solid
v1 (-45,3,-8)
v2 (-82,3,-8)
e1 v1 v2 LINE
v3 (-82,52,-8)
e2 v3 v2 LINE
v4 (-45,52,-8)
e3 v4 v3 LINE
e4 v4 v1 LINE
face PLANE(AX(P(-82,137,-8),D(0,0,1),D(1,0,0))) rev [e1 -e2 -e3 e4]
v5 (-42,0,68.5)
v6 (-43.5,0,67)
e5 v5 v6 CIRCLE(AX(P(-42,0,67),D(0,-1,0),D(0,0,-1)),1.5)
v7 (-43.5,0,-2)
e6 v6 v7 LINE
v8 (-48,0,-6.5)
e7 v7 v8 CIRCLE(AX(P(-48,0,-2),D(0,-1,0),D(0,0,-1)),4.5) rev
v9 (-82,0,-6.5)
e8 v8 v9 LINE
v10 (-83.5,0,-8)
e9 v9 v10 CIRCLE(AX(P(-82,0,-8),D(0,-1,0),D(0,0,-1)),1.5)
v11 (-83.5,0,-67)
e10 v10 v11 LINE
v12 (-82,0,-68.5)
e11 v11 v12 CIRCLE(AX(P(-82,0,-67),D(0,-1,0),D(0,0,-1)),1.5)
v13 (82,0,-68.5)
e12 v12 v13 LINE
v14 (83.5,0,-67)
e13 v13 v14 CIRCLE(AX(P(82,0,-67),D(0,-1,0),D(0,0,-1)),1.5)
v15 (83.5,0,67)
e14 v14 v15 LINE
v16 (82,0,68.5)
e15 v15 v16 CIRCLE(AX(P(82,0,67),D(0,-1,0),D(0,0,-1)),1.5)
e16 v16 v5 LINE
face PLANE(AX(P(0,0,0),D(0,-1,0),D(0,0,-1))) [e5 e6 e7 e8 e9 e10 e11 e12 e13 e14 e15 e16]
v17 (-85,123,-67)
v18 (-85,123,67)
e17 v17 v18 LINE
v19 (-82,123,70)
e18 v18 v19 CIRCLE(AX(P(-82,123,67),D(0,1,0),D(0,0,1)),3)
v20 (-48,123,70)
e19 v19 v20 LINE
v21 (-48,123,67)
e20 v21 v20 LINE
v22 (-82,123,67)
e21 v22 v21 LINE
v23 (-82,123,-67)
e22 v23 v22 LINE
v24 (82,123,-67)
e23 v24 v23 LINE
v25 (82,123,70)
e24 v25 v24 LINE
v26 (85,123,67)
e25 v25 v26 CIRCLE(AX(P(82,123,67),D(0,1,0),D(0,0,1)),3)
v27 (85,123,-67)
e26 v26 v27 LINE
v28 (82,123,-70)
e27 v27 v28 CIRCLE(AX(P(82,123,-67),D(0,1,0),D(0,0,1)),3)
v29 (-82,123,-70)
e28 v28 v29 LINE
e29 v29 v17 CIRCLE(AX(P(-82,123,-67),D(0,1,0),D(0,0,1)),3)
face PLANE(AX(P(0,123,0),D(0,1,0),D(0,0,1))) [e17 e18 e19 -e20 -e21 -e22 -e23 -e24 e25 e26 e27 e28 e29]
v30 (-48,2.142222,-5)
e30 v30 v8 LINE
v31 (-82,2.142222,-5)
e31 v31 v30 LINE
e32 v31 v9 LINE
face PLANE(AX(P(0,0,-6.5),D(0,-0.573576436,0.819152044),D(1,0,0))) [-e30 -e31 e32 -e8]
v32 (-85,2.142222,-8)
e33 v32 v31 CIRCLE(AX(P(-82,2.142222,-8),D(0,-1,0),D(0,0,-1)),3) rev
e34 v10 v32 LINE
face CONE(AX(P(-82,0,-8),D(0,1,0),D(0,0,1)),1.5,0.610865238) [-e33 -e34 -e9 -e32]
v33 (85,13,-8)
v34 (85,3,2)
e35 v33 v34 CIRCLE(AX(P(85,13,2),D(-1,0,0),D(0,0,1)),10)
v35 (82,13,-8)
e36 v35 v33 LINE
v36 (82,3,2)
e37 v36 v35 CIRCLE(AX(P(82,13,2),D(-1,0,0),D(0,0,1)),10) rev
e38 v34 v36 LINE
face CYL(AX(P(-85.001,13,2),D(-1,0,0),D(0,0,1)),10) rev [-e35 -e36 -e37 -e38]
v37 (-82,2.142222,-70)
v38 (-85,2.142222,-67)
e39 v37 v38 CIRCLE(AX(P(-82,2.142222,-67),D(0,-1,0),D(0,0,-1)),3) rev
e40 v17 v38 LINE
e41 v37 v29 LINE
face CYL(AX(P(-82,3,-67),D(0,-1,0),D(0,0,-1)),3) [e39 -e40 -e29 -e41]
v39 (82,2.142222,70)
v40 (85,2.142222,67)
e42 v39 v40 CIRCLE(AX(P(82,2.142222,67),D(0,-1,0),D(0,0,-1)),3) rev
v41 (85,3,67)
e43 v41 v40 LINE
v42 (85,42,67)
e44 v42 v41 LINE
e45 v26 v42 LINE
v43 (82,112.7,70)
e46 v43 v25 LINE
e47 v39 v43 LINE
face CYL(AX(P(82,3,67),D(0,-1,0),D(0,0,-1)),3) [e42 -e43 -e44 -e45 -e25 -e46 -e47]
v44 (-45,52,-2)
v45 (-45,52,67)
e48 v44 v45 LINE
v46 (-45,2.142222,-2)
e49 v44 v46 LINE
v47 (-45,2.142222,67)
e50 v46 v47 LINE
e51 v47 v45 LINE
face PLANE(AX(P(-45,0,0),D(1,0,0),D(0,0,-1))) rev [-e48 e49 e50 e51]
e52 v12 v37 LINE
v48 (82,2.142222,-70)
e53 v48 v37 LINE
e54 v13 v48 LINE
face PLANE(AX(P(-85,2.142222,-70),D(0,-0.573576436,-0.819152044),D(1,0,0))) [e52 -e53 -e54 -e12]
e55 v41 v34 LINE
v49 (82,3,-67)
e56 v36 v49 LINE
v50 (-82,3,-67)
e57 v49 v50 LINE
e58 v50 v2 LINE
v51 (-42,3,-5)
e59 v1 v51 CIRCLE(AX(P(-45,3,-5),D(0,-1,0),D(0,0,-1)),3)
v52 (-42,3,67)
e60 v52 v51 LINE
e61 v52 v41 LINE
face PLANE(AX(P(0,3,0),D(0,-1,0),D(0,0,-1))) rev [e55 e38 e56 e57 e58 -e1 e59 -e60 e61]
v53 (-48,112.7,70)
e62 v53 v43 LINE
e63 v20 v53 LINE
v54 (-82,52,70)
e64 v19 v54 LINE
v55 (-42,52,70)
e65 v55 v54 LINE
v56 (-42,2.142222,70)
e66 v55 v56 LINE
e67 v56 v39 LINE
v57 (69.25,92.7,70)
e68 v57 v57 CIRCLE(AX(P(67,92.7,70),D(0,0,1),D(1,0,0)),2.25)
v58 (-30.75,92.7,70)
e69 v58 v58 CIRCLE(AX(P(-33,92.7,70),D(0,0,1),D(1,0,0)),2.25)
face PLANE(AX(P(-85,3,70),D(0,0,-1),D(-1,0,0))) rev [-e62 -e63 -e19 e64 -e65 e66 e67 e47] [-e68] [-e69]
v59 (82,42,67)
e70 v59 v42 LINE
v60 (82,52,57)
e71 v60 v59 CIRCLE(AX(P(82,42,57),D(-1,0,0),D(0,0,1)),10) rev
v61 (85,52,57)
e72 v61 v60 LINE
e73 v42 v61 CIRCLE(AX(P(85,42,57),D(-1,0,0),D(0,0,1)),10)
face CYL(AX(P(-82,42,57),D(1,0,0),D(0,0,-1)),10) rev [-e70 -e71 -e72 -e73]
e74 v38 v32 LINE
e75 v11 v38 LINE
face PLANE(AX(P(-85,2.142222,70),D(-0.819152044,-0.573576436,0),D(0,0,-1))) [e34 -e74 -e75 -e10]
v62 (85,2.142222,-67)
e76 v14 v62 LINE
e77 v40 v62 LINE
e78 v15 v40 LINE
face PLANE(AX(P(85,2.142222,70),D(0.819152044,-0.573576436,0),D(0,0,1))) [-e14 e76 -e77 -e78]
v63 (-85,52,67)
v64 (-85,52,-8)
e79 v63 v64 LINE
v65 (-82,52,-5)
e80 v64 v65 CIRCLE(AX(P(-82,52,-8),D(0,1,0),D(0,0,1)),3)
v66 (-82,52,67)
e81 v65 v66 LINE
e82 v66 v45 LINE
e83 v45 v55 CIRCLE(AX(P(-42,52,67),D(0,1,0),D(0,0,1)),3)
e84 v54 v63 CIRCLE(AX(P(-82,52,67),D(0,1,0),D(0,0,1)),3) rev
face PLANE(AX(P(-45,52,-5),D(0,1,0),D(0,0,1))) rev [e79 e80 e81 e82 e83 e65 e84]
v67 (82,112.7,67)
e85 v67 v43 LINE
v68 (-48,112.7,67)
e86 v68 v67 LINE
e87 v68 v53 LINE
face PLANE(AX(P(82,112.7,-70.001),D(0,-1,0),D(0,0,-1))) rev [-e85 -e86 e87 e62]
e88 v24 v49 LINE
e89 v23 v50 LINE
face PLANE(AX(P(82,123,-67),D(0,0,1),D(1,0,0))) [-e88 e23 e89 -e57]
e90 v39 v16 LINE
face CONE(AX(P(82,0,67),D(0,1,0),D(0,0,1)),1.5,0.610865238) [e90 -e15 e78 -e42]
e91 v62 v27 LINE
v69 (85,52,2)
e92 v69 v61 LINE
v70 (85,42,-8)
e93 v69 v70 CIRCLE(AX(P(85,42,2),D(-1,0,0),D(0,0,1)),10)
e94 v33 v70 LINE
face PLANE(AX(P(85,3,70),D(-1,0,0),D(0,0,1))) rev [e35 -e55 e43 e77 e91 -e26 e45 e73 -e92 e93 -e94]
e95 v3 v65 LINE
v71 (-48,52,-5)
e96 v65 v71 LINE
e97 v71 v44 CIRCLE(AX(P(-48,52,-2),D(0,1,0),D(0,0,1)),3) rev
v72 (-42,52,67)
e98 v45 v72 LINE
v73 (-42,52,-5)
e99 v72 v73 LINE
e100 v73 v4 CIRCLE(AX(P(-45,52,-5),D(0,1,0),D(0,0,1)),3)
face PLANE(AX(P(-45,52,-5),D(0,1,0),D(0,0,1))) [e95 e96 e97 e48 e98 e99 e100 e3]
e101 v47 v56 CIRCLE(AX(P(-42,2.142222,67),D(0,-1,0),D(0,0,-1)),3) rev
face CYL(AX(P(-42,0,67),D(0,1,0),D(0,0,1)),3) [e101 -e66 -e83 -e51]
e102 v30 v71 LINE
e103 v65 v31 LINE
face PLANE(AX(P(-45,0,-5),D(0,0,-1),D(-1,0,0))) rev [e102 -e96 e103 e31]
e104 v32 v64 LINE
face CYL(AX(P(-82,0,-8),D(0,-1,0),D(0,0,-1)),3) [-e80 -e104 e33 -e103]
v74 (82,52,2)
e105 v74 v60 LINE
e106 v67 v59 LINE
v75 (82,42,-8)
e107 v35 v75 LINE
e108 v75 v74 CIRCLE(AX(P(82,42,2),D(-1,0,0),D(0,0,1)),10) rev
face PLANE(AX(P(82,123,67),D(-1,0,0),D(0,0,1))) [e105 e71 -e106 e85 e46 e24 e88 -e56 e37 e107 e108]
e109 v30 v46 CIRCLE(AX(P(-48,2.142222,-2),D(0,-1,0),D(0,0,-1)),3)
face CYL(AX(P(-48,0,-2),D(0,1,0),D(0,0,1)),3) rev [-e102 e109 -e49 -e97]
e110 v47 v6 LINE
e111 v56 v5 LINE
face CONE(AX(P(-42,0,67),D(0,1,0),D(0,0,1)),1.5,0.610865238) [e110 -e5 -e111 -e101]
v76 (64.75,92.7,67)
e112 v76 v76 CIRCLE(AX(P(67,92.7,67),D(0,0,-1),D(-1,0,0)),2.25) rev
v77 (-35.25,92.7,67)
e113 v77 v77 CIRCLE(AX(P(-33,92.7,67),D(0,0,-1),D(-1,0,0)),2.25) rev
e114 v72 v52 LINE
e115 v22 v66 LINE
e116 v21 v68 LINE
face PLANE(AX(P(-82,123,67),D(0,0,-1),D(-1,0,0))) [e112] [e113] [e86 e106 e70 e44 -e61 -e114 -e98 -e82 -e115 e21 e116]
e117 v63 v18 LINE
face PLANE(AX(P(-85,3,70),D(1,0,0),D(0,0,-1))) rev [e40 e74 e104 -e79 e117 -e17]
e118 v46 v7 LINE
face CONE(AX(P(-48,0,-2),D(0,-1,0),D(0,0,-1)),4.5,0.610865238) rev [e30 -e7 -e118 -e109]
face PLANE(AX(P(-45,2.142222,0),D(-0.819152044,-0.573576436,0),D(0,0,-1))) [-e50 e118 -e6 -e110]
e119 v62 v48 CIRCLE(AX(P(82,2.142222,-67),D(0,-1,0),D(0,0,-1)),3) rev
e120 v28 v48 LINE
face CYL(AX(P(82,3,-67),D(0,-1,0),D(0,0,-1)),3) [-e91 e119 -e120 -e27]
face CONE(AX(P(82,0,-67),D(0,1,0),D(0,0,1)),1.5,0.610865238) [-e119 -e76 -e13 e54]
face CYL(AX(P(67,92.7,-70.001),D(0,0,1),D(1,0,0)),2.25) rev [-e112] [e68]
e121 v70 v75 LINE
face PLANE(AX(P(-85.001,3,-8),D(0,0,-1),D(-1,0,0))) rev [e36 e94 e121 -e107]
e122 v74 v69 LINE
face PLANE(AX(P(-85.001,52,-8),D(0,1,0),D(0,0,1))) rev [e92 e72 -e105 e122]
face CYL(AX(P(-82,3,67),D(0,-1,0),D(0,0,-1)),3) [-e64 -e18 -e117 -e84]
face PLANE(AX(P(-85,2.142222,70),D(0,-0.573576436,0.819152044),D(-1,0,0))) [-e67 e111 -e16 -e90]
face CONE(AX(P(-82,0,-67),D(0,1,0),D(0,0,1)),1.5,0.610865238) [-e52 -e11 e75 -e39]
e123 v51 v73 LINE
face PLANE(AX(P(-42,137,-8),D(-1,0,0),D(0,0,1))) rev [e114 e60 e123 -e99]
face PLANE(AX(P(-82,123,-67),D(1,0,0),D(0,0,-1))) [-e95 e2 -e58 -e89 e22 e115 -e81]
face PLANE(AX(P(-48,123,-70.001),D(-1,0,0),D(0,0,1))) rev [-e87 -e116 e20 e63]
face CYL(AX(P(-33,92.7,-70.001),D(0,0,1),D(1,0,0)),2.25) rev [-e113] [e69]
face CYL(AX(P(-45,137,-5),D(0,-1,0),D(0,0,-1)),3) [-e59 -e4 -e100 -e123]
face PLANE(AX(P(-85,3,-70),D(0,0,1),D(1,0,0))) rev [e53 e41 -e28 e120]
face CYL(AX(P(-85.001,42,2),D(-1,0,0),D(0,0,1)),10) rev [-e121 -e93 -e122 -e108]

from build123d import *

# Parameters (mm, degrees)
SKETCH1_W           = 170
SKETCH1_H           = 140
BOSS_EXTRUDE1_DEPTH = 3
SKETCH3_W           = 170
SKETCH3_H           = 140
SKETCH3_W_2         = 164
SKETCH3_H_2         = 134
BOSS_EXTRUDE2_DEPTH = 120
CUT_EXTRUDE1_REACH  = 206.827
SKETCH4_W           = 130
SKETCH4_H           = 10.3
SKETCH5_W           = 75
SKETCH5_H           = 52
CUT_EXTRUDE2_DEPTH  = 40
BOSS_EXTRUDE3_DEPTH = 49
CUT_EXTRUDE3_REACH  = 206.827
SKETCH8_R           = 2.25
CUT_EXTRUDE4_REACH  = 223.199
SKETCH9_W           = 75
SKETCH9_H           = 49
FILLET1_R           = 3
CHAMFER1_SIZE       = 1.5
CHAMFER1_SIZE2      = 2.14222201
FILLET2_R           = 10


with BuildPart() as part:
    # Sketch1 → Boss-Extrude1 (new body)
    with BuildSketch(Plane(origin=(0, 0, 0), x_dir=(1, 0, 0), z_dir=(0, 1, 0))):
        Rectangle(SKETCH1_W, SKETCH1_H)
    extrude(amount=BOSS_EXTRUDE1_DEPTH)

    # Sketch3 → Boss-Extrude2 (add)
    with BuildSketch(Plane(origin=(0, 3, 0), x_dir=(1, 0, 0), z_dir=(0, 1, 0))):
        Rectangle(SKETCH3_W, SKETCH3_H)
        Rectangle(SKETCH3_W_2, SKETCH3_H_2, mode=Mode.SUBTRACT)
    extrude(amount=BOSS_EXTRUDE2_DEPTH)

    # Sketch4 → Cut-Extrude1 (cut, up to next)
    with BuildSketch(Plane.XY.offset(70), mode=Mode.PRIVATE) as cut_extrude1_sk1:
        with Locations((17, 117.85)):
            Rectangle(SKETCH4_W, SKETCH4_H)
    cut_extrude1_tool1 = extrude(cut_extrude1_sk1.sketch, amount=-CUT_EXTRUDE1_REACH, mode=Mode.PRIVATE) & part.part
    add(cut_extrude1_tool1.solids().sort_by_distance((17, 117.85, 70))[0], mode=Mode.SUBTRACT)

    # Sketch5 → Cut-Extrude2 (cut)
    with BuildSketch(Plane.ZY.offset(85)):
        with Locations((32.5, 26)):
            Rectangle(SKETCH5_W, SKETCH5_H)
    extrude(amount=-CUT_EXTRUDE2_DEPTH, mode=Mode.SUBTRACT)

    # Sketch6 → Boss-Extrude3 (add)
    with BuildSketch(Plane(origin=(0, 3, 0), x_dir=(1, 0, 0), z_dir=(0, 1, 0))):
        Polygon((-45, 5), (-45, -67), (-42, -67), (-42, 8), (-82, 8), (-82, 5), align=None)
    extrude(amount=BOSS_EXTRUDE3_DEPTH)

    # Sketch8 → Cut-Extrude3 (cut, up to next)
    with BuildSketch(Plane.XY.offset(70), mode=Mode.PRIVATE) as cut_extrude3_sk1:
        with Locations((67, 92.7)):
            Circle(SKETCH8_R)
    cut_extrude3_tool1 = extrude(cut_extrude3_sk1.sketch, amount=-CUT_EXTRUDE3_REACH, mode=Mode.PRIVATE) & part.part
    # Sketch8 → Cut-Extrude3 (cut, up to next)
    with BuildSketch(Plane.XY.offset(70), mode=Mode.PRIVATE) as cut_extrude3_sk2:
        with Locations((-33, 92.7)):
            Circle(SKETCH8_R)
    cut_extrude3_tool2 = extrude(cut_extrude3_sk2.sketch, amount=-CUT_EXTRUDE3_REACH, mode=Mode.PRIVATE) & part.part
    add(cut_extrude3_tool1.solids().sort_by_distance((67, 92.7, 70))[0], mode=Mode.SUBTRACT)
    add(cut_extrude3_tool2.solids().sort_by_distance((-33, 92.7, 70))[0], mode=Mode.SUBTRACT)

    # Sketch9 → Cut-Extrude4 (cut, up to next)
    with BuildSketch(Plane(origin=(85, 0, 0), x_dir=(0, 0, -1), z_dir=(1, 0, 0)), mode=Mode.PRIVATE) as cut_extrude4_sk1:
        with Locations((-29.5, 27.5)):
            Rectangle(SKETCH9_W, SKETCH9_H)
    cut_extrude4_tool1 = extrude(cut_extrude4_sk1.sketch, amount=-CUT_EXTRUDE4_REACH, mode=Mode.PRIVATE) & part.part
    add(cut_extrude4_tool1.solids().sort_by_distance((85, 27.5, 29.5))[0], mode=Mode.SUBTRACT)

    # Fillet1
    fillet1_edges = [part.edges().sort_by_distance(p)[0] for p in [
        (-45, 26, -5),
        (-45, 26, 70),
        (-85, 26, -5),
        (-42, 27.5, -8),
        (85, 61.5, 70),
        (-85, 87.5, 70),
        (-85, 61.5, -70),
        (85, 61.5, -70),
    ]]
    fillet(fillet1_edges, radius=FILLET1_R - 0.0001)  # a hair under: the kernel refuses the full size

    # Chamfer1
    chamfer1_edges = [part.edges().sort_by_distance(p)[0] for p in [
        (-45, 0, 32.5),
        (20, 0, 70),
        (-65, 0, -5),
        (-85, 0, -37.5),
        (0, 0, -70),
        (85, 0, 0),
        (-84.121349633, 0, -69.121349633),
        (84.121349633, 0, 69.121349633),
        (84.121349633, 0, -69.121349633),
        (-84.121349633, 0, -5.878650367),
        (-44.121349633, 0, 69.121349633),
        (-45.878650367, 0, -4.121349633),
    ]]
    chamfer1_side = [part.faces().sort_by_distance(p)[0] for p in [
        (9.378358702, 0, -4.68911711),
    ]]
    chamfer(chamfer1_edges, length=CHAMFER1_SIZE, length2=CHAMFER1_SIZE2, reference=chamfer1_side[0])

    # Fillet2
    fillet2_edges = [part.edges().sort_by_distance(p)[0] for p in [
        (83.5, 52, 67),
        (83.5, 52, -8),
        (83.5, 3, -8),
    ]]
    fillet(fillet2_edges, radius=FILLET2_R)


solid = part.part
